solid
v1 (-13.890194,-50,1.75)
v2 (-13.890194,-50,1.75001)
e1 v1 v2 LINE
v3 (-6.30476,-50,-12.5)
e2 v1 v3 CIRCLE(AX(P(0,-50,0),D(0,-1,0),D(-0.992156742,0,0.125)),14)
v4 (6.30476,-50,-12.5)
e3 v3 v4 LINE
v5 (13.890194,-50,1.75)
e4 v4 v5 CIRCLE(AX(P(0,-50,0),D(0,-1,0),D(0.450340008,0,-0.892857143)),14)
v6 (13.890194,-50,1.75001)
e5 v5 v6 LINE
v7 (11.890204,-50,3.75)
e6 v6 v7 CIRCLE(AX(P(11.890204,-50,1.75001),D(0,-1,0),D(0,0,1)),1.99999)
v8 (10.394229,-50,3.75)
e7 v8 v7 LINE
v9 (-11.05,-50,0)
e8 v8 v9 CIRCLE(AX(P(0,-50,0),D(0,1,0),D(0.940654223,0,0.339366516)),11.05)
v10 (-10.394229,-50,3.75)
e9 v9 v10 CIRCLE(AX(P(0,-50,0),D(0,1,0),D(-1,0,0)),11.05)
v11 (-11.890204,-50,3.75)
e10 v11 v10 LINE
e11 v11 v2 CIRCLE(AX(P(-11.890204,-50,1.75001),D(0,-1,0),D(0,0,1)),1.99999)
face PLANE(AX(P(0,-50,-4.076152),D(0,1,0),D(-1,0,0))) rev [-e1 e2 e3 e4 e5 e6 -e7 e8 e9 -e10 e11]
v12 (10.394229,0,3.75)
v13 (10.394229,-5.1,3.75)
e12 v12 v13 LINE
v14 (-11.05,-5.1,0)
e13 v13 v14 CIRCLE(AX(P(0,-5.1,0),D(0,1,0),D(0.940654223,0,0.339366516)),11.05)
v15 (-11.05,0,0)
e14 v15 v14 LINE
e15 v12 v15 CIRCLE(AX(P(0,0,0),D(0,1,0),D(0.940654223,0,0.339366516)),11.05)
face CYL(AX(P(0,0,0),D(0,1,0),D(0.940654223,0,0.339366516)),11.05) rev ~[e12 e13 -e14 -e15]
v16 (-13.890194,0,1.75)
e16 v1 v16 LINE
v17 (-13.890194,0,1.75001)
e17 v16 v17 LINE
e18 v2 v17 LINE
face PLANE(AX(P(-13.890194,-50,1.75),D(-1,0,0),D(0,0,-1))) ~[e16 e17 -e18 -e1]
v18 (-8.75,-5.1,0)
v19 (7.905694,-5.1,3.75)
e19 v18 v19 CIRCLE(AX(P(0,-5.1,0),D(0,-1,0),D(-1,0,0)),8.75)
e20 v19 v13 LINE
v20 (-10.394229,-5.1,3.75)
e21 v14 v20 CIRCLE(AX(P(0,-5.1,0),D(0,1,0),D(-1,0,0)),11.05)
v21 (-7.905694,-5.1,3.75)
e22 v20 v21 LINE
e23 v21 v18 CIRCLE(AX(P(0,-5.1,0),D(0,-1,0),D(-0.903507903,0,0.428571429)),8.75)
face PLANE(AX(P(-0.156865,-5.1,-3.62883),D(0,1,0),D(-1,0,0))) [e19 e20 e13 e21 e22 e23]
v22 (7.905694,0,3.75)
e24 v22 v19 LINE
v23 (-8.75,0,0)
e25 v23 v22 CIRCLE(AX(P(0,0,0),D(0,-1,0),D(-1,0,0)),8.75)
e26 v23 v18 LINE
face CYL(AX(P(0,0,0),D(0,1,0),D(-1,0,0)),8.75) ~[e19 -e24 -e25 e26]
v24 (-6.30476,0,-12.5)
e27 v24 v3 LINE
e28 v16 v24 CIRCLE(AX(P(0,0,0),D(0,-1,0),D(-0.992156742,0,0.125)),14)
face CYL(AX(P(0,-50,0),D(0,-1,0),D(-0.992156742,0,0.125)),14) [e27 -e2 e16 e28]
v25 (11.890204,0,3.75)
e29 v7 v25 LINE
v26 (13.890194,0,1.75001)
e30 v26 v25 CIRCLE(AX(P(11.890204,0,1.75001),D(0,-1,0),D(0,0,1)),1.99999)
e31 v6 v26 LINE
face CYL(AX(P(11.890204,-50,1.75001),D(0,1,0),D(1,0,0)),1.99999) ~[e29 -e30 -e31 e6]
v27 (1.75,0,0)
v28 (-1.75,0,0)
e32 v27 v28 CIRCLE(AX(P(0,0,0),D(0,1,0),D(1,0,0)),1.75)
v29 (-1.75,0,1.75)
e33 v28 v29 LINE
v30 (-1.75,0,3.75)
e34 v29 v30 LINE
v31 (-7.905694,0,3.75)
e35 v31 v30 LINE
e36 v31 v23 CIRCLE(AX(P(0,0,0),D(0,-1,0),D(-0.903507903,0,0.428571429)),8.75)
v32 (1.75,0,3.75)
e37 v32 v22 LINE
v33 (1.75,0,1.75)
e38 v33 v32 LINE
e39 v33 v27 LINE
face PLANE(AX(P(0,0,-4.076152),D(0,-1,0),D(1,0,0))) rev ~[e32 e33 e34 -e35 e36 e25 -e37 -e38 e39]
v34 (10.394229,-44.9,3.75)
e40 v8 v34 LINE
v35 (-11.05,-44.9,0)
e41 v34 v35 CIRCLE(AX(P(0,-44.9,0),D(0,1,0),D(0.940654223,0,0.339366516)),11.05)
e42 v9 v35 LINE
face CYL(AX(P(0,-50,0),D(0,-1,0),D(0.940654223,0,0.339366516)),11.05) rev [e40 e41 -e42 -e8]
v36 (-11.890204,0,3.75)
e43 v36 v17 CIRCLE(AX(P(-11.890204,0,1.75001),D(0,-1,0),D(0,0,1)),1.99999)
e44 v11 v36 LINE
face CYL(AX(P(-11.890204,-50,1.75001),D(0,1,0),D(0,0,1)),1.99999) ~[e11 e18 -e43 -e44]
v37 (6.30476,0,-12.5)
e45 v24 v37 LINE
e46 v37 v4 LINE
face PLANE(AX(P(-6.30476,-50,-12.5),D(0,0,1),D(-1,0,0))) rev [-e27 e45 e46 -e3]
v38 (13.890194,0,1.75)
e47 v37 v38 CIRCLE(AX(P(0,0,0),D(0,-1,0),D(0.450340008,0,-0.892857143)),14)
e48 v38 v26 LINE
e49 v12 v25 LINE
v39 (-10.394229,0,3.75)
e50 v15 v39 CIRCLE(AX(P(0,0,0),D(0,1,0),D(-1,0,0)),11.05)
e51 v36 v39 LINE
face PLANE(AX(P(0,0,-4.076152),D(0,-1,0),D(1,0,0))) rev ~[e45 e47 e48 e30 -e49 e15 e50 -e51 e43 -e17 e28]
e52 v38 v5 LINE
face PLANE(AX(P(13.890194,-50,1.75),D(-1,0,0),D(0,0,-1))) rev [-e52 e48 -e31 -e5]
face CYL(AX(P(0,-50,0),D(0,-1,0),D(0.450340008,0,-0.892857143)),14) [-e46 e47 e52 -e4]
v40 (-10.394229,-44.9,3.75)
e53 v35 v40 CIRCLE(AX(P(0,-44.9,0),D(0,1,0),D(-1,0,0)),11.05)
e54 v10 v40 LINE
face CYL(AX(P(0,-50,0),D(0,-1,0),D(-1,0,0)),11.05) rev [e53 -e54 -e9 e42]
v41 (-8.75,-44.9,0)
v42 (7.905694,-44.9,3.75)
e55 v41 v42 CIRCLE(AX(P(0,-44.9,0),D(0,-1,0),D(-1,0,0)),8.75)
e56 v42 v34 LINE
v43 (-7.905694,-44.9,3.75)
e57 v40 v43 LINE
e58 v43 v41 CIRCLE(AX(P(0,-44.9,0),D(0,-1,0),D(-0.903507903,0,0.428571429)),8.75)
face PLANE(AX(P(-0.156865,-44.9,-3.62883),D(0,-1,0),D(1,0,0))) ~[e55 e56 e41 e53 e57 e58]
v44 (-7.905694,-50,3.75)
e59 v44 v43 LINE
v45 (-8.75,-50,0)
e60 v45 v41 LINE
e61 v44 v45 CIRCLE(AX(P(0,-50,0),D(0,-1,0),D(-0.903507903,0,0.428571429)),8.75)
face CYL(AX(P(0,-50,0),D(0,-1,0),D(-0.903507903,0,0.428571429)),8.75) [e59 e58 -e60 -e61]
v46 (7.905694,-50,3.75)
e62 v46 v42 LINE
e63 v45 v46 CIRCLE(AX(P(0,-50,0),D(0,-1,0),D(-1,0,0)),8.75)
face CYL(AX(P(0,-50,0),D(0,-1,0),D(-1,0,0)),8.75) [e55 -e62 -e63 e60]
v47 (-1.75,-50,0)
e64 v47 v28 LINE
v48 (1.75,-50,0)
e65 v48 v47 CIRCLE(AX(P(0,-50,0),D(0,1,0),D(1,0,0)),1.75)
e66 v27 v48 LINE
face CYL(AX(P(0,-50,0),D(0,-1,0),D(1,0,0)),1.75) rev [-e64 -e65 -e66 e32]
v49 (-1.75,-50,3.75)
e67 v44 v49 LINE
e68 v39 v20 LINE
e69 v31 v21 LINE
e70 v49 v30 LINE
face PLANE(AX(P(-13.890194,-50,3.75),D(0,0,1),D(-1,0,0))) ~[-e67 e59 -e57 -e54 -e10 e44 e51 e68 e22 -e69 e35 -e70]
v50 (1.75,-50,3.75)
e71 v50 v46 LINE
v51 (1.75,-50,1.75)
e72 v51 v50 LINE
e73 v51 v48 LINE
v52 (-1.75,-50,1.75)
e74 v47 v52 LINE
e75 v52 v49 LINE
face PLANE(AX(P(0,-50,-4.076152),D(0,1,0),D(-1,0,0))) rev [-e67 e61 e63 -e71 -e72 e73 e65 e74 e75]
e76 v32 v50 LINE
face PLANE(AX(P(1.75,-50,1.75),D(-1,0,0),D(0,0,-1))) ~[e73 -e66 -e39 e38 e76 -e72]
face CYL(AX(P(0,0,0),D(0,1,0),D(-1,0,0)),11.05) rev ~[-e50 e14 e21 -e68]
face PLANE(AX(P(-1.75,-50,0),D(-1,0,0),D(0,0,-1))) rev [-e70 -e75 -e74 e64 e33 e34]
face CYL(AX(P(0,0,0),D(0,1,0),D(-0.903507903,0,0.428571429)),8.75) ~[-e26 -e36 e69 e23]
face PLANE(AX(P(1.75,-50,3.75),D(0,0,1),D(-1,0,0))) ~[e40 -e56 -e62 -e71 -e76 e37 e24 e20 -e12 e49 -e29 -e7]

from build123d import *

# Parameters (mm, degrees)
F0_W     = 12.1401943831
F0_H     = 2
F1_DEPTH = 25
F4_DEPTH = 5.1
F8_R     = 1.99999


# Not quite as in the source:
# - a fillet or chamfer is up to 0.001 mm smaller than in the source, because OpenCascade refuses the exact size


with BuildPart() as f1:
    # F0 (on Front) → F1 (new body)
    with BuildSketch(Plane.XZ):
        with BuildLine():
            Line((-1.75, 1.75), (-13.8901943831, 1.75))
            ThreePointArc((-13.8901943831, 1.75), (-12.3581823788, -6.5783986115), (-6.3047601065, -12.5))
            Line((-6.3047601065, -12.5), (6.3047601065, -12.5))
            ThreePointArc((6.3047601065, -12.5), (12.3581823788, -6.5783986115), (13.8901943831, 1.75))
            Line((13.8901943831, 1.75), (1.75, 1.75))
            Line((1.75, 1.75), (1.75, 0))
            ThreePointArc((1.75, 0), (0, -1.75), (-1.75, 0))
            Line((-1.75, 0), (-1.75, 1.75))
        make_face()
        with Locations((7.8200971915, 2.75)):
            Rectangle(F0_W, F0_H)
        with Locations((-7.8200971915, 2.75)):
            Rectangle(F0_W, F0_H)
    extrude(amount=F1_DEPTH)

    # F3 (on face) → F4 (cut)
    with BuildSketch(Plane(origin=(0, 0, 0), x_dir=(-1, 0, 0), z_dir=(0, 1, 0))):
        with BuildLine():
            ThreePointArc((-10.3942291681, 3.75), (-1.9034531373, -10.8848227433), (11.05, 0))
            ThreePointArc((11.05, 0), (10.8848227433, 1.9034531373), (10.3942291681, 3.75))
            Line((10.3942291681, 3.75), (7.9056941504, 3.75))
            ThreePointArc((7.9056941504, 3.75), (8.5363143047, 1.921936027), (8.75, 0))
            ThreePointArc((8.75, 0), (-1.921936027, -8.5363143047), (-7.9056941504, 3.75))
            Line((-7.9056941504, 3.75), (-10.3942291681, 3.75))
        make_face()
    extrude(amount=-F4_DEPTH, mode=Mode.SUBTRACT)

    # F7: F1 across face


with BuildPart() as f1_1:
    add(f1.part)
    add(f1.part.mirror(Plane(origin=(0, -25, -3.8986050214), x_dir=(1, 0, 0), z_dir=(0, -1, 0))))

    # F8 (radius 2 in the source; OpenCascade refuses exactly that, so slightly less here)
    f8_edges = [f1_1.edges().sort_by_distance(p)[0] for p in [
        (13.890194, -25, 3.75),
        (-13.890194, -25, 3.75),
    ]]
    fillet(f8_edges, radius=F8_R)


solid = f1_1.part
